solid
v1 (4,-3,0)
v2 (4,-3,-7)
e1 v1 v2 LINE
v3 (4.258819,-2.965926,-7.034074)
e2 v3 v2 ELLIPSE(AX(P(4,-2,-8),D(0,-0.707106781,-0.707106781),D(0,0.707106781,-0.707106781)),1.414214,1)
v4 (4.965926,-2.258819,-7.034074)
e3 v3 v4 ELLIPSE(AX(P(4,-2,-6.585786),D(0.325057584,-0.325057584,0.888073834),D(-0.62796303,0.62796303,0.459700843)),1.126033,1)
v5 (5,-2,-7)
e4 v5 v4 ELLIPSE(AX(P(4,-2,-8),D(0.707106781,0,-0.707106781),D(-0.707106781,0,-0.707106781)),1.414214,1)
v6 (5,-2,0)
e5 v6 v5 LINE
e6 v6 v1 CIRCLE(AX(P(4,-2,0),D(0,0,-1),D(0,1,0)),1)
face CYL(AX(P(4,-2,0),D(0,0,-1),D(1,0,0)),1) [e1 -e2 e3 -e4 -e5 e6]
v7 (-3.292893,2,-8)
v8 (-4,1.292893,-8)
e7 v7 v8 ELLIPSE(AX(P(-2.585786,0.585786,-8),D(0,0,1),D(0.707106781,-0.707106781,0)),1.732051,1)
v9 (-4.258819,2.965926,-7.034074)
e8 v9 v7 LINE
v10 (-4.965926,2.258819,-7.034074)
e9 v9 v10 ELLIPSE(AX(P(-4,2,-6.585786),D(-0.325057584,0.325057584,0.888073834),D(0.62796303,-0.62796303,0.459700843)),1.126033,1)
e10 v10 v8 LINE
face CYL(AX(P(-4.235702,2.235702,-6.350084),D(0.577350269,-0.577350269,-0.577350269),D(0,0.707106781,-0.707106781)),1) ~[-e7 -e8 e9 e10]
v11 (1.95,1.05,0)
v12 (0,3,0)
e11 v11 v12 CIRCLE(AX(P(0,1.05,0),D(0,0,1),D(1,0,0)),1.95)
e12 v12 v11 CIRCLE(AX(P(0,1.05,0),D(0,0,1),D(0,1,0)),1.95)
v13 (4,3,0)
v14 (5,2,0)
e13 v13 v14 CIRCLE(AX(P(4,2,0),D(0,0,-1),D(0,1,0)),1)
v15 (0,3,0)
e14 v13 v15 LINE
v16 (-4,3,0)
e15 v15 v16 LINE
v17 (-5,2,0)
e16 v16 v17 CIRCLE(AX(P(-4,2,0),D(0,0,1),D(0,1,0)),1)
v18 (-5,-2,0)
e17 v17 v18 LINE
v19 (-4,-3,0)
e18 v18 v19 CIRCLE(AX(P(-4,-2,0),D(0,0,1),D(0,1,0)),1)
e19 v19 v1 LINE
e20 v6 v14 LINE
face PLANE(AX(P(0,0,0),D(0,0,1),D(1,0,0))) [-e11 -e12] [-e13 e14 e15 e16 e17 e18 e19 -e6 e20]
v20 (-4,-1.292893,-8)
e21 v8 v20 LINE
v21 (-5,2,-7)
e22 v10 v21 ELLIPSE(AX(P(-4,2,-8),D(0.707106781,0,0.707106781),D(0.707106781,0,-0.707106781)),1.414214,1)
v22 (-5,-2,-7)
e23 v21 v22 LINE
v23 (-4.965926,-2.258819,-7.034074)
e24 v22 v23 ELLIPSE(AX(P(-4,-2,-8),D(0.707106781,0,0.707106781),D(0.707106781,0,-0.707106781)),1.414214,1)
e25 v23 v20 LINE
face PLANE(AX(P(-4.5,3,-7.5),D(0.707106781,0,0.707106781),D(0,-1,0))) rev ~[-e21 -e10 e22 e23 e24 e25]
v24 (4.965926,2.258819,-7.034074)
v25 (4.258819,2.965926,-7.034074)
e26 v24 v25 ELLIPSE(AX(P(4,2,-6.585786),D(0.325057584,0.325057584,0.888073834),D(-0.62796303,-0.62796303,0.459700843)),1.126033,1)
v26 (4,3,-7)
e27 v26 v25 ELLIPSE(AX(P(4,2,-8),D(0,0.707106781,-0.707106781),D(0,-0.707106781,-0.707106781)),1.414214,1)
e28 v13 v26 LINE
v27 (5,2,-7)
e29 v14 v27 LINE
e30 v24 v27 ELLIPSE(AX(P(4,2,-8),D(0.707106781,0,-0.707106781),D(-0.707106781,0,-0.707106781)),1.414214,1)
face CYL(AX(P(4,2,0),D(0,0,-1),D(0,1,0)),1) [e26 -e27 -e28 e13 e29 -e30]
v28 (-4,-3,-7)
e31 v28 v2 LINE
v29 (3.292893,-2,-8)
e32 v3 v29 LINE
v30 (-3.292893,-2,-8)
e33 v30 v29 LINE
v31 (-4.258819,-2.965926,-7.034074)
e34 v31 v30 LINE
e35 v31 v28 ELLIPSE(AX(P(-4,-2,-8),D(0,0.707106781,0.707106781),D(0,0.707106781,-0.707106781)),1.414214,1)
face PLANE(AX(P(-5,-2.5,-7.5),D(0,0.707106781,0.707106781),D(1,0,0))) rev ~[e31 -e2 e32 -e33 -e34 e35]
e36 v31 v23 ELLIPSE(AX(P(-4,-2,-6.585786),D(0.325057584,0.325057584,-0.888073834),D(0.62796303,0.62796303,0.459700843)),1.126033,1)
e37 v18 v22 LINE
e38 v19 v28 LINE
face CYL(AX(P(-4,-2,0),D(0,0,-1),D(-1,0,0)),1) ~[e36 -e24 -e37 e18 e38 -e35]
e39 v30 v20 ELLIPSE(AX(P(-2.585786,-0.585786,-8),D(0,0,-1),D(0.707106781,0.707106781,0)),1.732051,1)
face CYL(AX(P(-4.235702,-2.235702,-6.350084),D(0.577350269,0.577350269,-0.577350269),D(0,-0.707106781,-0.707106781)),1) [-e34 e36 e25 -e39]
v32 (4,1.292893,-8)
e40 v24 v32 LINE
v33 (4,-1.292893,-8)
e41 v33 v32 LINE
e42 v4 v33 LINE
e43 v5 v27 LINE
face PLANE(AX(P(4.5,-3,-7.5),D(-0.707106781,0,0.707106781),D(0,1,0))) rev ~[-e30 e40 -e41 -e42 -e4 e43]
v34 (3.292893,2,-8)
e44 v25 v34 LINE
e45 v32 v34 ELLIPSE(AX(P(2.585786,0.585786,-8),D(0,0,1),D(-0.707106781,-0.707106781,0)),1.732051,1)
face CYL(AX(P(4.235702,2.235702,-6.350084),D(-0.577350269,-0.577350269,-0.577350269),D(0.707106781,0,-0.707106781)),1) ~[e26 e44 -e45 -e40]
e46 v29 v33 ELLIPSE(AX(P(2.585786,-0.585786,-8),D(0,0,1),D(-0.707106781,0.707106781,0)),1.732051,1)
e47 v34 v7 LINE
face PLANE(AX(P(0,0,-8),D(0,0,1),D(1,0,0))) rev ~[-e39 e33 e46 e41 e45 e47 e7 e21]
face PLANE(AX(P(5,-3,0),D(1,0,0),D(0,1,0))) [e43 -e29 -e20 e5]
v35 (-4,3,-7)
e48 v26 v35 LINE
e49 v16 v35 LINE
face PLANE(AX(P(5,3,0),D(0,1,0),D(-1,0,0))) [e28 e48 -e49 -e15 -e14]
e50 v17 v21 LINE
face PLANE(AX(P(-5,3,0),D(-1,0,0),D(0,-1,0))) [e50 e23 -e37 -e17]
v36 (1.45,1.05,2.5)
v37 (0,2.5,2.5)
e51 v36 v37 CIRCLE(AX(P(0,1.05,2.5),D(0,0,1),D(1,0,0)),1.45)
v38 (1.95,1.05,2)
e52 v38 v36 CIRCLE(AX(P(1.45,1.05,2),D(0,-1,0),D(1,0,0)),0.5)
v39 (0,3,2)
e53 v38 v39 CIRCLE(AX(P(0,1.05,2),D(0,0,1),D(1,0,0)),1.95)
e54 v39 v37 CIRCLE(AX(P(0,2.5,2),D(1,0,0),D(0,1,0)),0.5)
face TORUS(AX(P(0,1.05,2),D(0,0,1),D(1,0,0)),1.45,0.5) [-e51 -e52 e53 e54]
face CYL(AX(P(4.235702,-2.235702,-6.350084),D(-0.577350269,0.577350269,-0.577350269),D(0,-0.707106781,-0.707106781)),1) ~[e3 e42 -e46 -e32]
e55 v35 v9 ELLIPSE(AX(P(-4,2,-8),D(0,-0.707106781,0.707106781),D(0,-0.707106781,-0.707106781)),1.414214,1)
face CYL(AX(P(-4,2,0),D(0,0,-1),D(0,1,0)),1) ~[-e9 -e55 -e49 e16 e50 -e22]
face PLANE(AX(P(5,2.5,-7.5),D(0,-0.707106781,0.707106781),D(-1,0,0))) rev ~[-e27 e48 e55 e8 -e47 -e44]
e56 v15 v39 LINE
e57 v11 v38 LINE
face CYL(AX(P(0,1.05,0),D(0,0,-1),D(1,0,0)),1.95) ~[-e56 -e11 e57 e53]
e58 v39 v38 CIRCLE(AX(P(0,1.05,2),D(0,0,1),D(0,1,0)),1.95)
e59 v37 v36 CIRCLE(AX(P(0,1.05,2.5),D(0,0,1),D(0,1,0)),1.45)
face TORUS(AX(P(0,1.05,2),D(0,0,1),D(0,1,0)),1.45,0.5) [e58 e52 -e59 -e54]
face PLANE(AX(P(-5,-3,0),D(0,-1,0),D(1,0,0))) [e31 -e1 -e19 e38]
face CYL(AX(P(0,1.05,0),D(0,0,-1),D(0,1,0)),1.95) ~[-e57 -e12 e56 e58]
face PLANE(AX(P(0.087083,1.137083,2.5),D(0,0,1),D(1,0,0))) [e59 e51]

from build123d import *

# Parameters (mm, degrees)
F1_DEPTH = 8
F2_DEPTH = 2.5
F3_R     = 0.5
F4_SIZE  = 1
F5_F1_R  = 1
F5_F2_R  = 1
F5_F3_R  = 1
F5_F4_R  = 1
F5_F5_R  = 1
F5_F6_R  = 1
F5_F7_R  = 1
F5_F8_R  = 1


with BuildPart() as f1:
    # F0 (on Top) → F1 (new body)
    with BuildSketch(Plane.XY):
        Polygon((-5, -3), (5, -3), (5, 3), (0, 3), (-5, 3), align=None)
        with BuildLine():
            ThreePointArc((1.95, 1.05), (-1.3788582233, -0.3288582233), (0, 3))
            ThreePointArc((0, 3), (1.3788582233, 2.4288582233), (1.95, 1.05))
        make_face(mode=Mode.SUBTRACT)
        with BuildLine():
            ThreePointArc((1.95, 1.05), (1.3788582233, 2.4288582233), (0, 3))
            ThreePointArc((0, 3), (-1.3788582233, -0.3288582233), (1.95, 1.05))
        make_face()
    extrude(amount=-F1_DEPTH)

    # F0 (on Top) → F2 (join)
    with BuildSketch(Plane.XY):
        with BuildLine():
            ThreePointArc((1.95, 1.05), (1.3788582233, 2.4288582233), (0, 3))
            ThreePointArc((0, 3), (-1.3788582233, -0.3288582233), (1.95, 1.05))
        make_face()
    extrude(amount=F2_DEPTH)

    # F3
    f3_edges = [f1.edges().sort_by_distance(p)[0] for p in [
        (-1.95, 1.05, 2.5),
    ]]
    fillet(f3_edges, radius=F3_R)

    # F4
    f4_edges = [f1.edges().sort_by_distance(p)[0] for p in [
        (-5, 0, -8),
        (0, -3, -8),
        (0, 3, -8),
        (5, 0, -8),
    ]]
    chamfer(f4_edges, length=F4_SIZE)

    # F5: fillet of radius 1 on 8 edges, made by hand

    # F5_f1
    f5_f1_edges = [f1.edges().sort_by_distance(p)[0] for p in [
        (5, 3, -3.5),
    ]]
    fillet(f5_f1_edges, radius=F5_F1_R)

    # F5_f2
    f5_f2_edges = [f1.edges().sort_by_distance(p)[0] for p in [
        (-5, 3, -3.5),
    ]]
    fillet(f5_f2_edges, radius=F5_F2_R)

    # F5_f3
    f5_f3_edges = [f1.edges().sort_by_distance(p)[0] for p in [
        (5, -3, -3.5),
    ]]
    fillet(f5_f3_edges, radius=F5_F3_R)

    # F5_f4
    f5_f4_edges = [f1.edges().sort_by_distance(p)[0] for p in [
        (4.3535533906, 2.3535533906, -7.6464466094),
    ]]
    fillet(f5_f4_edges, radius=F5_F4_R)

    # F5_f5
    f5_f5_edges = [f1.edges().sort_by_distance(p)[0] for p in [
        (-4.3535533906, 2.3535533906, -7.6464466094),
    ]]
    fillet(f5_f5_edges, radius=F5_F5_R)

    # F5_f6
    f5_f6_edges = [f1.edges().sort_by_distance(p)[0] for p in [
        (-5, -3, -3.5),
    ]]
    fillet(f5_f6_edges, radius=F5_F6_R)

    # F5_f7
    f5_f7_edges = [f1.edges().sort_by_distance(p)[0] for p in [
        (4.3535533906, -2.3535533906, -7.6464466094),
    ]]
    fillet(f5_f7_edges, radius=F5_F7_R)

    # F5_f8
    f5_f8_edges = [f1.edges().sort_by_distance(p)[0] for p in [
        (-4.3535533906, -2.3535533906, -7.6464466094),
    ]]
    fillet(f5_f8_edges, radius=F5_F8_R)


solid = f1.part
